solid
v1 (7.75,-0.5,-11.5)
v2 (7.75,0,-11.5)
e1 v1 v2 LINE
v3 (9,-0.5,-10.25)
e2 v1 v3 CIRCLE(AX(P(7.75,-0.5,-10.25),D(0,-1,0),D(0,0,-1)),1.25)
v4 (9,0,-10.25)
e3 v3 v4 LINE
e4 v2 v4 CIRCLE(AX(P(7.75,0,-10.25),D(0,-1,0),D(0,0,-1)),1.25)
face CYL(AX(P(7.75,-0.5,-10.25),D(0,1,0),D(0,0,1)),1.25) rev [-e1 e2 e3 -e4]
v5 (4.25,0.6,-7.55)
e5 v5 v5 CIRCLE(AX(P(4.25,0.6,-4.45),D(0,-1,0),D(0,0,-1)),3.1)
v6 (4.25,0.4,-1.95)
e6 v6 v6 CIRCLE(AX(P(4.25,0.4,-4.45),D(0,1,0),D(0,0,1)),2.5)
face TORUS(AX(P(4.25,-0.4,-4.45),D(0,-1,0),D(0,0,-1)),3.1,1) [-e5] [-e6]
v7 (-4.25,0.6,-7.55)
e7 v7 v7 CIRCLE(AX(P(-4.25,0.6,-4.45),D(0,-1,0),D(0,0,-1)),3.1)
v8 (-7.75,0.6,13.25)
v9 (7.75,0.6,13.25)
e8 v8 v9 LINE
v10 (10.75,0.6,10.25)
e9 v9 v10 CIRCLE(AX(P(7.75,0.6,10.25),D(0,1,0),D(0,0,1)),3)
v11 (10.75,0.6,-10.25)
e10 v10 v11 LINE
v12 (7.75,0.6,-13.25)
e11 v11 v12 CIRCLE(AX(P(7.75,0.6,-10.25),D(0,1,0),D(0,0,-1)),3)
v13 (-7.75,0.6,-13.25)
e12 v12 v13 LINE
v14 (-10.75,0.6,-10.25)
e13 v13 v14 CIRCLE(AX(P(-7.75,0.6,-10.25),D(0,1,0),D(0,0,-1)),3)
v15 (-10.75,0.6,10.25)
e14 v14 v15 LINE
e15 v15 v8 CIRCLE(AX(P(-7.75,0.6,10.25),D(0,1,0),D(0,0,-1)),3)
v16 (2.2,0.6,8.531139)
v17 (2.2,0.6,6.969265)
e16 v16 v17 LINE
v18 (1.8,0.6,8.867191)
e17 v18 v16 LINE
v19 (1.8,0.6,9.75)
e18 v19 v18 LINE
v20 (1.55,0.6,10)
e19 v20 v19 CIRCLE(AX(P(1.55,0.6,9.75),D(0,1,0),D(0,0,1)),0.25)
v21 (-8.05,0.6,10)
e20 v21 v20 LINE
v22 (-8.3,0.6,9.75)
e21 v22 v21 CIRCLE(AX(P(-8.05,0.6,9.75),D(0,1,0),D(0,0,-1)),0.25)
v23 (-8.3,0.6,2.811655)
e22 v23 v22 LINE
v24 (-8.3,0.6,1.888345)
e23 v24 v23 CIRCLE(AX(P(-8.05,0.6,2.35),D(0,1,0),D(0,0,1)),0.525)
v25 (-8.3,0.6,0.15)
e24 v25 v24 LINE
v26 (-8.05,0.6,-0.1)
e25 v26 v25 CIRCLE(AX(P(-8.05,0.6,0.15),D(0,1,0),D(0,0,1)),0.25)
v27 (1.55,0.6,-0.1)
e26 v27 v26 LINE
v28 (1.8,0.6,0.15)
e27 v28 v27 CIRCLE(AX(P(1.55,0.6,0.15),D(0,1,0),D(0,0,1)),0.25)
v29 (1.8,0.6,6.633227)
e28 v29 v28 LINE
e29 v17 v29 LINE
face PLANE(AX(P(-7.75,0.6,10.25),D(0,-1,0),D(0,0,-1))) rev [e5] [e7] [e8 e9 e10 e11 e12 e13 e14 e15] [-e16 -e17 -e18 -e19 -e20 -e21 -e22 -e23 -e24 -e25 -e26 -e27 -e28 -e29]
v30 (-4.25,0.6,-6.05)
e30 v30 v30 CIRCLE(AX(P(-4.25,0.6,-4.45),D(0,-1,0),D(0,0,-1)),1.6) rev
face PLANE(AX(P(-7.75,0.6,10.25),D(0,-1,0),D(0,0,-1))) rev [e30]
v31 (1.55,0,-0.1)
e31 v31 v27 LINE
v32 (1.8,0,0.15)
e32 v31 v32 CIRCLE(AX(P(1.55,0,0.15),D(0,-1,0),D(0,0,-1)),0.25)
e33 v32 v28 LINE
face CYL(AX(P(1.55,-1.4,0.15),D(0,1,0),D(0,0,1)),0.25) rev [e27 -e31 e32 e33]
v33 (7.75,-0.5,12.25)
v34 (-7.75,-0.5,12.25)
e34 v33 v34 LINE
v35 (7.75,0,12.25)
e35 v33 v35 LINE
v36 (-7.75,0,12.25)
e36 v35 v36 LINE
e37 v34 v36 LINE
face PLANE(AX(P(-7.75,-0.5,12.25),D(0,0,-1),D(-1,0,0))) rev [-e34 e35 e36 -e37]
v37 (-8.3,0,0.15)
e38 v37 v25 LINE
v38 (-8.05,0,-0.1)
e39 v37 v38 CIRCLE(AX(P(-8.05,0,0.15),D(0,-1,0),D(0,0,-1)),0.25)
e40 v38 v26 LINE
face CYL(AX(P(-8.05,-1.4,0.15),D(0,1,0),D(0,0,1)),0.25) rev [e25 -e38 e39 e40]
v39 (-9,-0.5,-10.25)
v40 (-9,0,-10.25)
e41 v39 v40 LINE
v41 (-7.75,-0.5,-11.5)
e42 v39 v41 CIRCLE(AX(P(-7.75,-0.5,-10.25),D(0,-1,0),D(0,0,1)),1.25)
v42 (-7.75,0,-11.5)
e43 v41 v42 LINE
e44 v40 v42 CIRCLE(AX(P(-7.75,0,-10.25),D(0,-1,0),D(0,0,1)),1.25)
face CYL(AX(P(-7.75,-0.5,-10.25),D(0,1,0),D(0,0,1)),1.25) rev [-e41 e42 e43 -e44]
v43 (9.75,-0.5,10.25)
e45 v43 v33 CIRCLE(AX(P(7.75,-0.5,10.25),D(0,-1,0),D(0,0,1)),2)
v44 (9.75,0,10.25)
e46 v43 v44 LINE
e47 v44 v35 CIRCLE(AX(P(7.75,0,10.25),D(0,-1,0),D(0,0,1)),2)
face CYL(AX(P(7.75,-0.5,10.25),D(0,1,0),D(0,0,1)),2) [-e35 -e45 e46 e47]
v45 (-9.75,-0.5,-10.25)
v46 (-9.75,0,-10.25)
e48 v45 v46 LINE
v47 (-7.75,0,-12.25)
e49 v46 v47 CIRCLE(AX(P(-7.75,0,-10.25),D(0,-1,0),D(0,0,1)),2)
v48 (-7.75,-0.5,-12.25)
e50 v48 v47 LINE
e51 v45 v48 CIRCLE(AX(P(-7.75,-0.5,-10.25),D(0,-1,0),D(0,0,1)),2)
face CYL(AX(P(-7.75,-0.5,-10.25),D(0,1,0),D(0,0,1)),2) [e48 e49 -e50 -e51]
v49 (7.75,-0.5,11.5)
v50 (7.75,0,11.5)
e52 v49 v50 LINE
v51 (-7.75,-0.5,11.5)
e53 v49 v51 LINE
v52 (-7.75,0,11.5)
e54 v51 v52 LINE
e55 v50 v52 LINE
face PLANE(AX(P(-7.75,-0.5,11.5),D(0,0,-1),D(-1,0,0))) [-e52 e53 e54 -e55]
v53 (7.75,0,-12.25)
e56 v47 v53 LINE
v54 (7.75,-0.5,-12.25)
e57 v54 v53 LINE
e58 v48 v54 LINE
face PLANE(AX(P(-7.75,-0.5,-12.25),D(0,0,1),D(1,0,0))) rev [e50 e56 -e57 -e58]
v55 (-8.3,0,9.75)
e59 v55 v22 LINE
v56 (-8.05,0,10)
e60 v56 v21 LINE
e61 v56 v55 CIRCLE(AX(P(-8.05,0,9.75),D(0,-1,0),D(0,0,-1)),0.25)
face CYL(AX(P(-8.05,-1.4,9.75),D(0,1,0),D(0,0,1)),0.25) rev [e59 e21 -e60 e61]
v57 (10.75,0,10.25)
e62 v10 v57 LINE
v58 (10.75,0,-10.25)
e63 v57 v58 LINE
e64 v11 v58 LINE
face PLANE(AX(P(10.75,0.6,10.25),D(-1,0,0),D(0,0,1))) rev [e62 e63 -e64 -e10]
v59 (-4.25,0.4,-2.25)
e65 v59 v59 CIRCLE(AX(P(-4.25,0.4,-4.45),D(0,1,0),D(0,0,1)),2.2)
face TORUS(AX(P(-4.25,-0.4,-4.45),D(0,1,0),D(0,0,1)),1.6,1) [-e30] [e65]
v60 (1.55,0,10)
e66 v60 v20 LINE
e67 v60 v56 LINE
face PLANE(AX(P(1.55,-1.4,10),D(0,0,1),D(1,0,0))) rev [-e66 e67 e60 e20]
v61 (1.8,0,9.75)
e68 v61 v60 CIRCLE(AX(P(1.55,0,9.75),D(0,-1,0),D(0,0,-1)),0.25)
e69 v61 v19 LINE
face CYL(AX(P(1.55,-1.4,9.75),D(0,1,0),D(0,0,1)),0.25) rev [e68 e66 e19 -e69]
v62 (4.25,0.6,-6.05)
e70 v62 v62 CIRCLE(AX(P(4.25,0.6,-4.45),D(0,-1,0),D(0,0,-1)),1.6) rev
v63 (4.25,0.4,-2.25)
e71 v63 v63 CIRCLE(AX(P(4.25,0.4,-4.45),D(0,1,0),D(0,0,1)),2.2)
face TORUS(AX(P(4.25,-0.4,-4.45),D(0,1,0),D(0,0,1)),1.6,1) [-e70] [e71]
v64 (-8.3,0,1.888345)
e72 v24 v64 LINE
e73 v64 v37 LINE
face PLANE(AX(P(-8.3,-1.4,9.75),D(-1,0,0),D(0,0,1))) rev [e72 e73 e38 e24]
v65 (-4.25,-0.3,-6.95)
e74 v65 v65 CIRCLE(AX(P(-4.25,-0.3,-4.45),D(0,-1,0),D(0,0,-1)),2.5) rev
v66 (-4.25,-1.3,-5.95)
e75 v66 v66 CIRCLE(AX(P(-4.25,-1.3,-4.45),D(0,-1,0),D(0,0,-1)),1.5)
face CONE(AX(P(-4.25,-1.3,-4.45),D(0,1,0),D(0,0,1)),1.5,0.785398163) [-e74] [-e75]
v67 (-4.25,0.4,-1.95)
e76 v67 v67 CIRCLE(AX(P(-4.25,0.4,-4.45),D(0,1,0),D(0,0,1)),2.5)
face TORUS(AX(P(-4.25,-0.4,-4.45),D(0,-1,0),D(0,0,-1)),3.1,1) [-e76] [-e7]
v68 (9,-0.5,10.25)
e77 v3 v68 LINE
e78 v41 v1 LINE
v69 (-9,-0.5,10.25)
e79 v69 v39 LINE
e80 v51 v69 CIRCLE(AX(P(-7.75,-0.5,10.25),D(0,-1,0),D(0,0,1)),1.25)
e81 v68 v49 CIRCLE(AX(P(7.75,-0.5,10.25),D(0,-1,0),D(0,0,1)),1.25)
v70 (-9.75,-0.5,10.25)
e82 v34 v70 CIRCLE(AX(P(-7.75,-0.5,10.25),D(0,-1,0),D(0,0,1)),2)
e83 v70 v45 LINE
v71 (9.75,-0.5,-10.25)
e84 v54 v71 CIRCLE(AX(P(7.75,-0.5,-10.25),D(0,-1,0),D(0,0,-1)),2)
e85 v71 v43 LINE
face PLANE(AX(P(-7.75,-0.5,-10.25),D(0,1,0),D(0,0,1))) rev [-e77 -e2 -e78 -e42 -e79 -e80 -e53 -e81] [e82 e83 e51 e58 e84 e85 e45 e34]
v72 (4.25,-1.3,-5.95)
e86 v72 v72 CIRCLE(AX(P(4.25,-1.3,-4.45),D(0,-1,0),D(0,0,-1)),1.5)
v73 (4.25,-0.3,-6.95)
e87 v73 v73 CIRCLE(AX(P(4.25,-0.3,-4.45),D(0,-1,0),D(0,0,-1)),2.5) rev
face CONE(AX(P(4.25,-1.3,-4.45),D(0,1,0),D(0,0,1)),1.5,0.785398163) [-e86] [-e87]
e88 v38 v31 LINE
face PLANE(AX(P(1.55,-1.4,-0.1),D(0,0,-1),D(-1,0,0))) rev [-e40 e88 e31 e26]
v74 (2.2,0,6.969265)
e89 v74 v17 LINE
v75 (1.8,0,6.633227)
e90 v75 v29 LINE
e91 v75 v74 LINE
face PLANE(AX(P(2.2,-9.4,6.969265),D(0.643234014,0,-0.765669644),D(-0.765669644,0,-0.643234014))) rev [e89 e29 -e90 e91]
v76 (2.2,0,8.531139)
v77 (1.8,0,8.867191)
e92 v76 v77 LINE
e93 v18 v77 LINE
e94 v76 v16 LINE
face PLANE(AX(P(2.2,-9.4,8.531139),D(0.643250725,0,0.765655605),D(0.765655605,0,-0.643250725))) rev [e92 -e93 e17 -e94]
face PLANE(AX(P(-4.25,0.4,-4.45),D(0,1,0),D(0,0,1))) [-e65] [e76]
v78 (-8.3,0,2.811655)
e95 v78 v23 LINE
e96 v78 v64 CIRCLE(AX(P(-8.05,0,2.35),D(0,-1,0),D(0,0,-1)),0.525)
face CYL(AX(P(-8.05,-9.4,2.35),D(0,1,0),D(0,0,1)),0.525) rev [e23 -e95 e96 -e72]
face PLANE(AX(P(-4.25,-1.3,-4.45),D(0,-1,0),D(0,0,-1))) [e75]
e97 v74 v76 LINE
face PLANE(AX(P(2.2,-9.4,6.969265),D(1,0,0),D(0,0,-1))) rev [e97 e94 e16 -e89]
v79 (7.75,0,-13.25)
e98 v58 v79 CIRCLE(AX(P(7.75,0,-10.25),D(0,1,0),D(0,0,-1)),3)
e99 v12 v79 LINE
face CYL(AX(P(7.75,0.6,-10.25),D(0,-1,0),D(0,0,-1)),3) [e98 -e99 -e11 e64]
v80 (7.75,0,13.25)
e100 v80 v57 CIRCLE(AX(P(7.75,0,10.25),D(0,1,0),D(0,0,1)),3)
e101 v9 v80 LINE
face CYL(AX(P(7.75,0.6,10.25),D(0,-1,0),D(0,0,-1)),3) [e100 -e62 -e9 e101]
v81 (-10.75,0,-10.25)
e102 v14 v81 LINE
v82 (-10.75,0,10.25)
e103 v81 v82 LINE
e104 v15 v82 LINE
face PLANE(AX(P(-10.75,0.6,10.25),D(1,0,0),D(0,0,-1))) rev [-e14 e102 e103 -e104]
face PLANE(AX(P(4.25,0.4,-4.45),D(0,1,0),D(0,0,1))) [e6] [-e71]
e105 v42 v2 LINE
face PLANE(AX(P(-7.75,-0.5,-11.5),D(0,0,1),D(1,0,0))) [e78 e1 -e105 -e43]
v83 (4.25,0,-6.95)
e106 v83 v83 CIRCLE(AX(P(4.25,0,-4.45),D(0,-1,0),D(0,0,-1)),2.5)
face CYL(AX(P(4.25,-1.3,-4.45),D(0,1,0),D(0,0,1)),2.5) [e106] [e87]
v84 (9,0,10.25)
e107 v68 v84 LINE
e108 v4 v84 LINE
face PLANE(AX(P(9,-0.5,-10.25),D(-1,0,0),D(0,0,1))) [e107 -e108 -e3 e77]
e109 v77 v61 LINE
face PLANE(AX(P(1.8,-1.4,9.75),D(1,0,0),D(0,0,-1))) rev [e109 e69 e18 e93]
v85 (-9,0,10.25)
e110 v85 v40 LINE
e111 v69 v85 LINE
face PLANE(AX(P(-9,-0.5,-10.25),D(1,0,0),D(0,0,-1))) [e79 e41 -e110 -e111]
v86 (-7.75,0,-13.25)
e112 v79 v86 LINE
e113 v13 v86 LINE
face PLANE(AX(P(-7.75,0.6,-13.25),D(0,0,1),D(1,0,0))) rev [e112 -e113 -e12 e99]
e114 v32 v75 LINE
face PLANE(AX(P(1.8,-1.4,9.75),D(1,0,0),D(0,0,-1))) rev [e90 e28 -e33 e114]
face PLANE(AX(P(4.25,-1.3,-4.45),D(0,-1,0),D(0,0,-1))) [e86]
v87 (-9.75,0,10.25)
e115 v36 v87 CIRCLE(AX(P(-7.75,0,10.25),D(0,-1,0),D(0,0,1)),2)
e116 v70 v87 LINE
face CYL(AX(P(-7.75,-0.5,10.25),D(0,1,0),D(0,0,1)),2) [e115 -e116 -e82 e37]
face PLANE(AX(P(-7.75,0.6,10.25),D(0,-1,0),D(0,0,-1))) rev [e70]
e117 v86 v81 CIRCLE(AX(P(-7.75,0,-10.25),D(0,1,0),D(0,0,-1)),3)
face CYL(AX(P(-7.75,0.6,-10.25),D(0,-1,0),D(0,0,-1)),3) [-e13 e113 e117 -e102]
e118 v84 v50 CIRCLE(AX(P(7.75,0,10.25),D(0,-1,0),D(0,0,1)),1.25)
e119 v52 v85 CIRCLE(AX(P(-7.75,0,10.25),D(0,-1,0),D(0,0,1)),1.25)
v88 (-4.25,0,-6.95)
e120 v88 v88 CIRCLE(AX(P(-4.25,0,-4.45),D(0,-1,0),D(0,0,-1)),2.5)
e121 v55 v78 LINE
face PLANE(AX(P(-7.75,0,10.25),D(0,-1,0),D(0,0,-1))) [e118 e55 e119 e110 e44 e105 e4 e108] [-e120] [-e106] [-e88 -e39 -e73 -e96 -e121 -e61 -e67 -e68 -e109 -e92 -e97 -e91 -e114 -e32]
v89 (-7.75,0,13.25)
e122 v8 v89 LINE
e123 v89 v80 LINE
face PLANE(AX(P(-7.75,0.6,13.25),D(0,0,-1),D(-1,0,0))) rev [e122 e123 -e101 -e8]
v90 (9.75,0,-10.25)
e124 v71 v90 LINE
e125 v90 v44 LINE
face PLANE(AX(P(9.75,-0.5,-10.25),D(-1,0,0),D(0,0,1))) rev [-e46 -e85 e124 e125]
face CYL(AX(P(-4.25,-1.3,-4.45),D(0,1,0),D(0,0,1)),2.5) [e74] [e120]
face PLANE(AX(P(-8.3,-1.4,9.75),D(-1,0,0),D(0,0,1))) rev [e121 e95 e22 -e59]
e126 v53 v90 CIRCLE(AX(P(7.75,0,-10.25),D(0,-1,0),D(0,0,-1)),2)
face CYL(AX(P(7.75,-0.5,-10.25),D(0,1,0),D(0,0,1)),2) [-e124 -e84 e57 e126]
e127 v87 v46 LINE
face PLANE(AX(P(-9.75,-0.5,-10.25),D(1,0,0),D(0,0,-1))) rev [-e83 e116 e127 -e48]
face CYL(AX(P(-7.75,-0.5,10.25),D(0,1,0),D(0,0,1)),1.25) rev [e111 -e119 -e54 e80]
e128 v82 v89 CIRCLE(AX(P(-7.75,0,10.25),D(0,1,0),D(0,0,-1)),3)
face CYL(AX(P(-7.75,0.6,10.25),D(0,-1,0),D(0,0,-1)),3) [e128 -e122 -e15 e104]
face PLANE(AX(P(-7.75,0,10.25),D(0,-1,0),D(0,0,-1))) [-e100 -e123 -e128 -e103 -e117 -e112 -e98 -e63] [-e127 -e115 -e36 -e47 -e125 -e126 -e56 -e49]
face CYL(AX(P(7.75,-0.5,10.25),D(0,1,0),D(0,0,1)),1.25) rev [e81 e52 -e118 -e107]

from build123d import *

# Parameters (mm, degrees)
BOSS_EXTRUDE1_DEPTH = 0.6
CUT_EXTRUDE1_DEPTH  = 2
SKETCH3_R           = 0.525
CUT_EXTRUDE2_DEPTH  = 10
BOSS_EXTRUDE2_DEPTH = 0.5
SKETCH5_R           = 2.5
BOSS_EXTRUDE3_DEPTH = 1.3
SKETCH6_R           = 2.5
SKETCH6_R_2         = 2.2
CUT_EXTRUDE3_DEPTH  = 0.2
FILLET1_R           = 1
CHAMFER1_SIZE       = 1


with BuildPart() as part:
    # Sketch1 → Boss-Extrude1 (new body)
    with BuildSketch(Plane(origin=(0, 0, 0), x_dir=(1, 0, 0), z_dir=(0, 1, 0))):
        with BuildLine():
            Line((-7.75, -13.25), (7.75, -13.25))
            ThreePointArc((7.75, -13.25), (9.871320344, -12.371320344), (10.75, -10.25))
            Line((10.75, -10.25), (10.75, 10.25))
            ThreePointArc((10.75, 10.25), (9.871320344, 12.371320344), (7.75, 13.25))
            Line((7.75, 13.25), (-7.75, 13.25))
            ThreePointArc((-7.75, 13.25), (-9.871320344, 12.371320344), (-10.75, 10.25))
            Line((-10.75, 10.25), (-10.75, -10.25))
            ThreePointArc((-10.75, -10.25), (-9.871320344, -12.371320344), (-7.75, -13.25))
        make_face()
    extrude(amount=BOSS_EXTRUDE1_DEPTH)

    # Sketch2 → Cut-Extrude1 (cut)
    with BuildSketch(Plane(origin=(0, 0.6, 0), x_dir=(1, 0, 0), z_dir=(0, 1, 0))):
        with BuildLine():
            Line((1.55, -10), (-8.05, -10))
            ThreePointArc((-8.05, -10), (-8.226776695, -9.926776695), (-8.3, -9.75))
            Line((-8.3, -9.75), (-8.3, -0.15))
            ThreePointArc((-8.3, -0.15), (-8.226776695, 0.026776695), (-8.05, 0.1))
            Line((-8.05, 0.1), (1.55, 0.1))
            ThreePointArc((1.55, 0.1), (1.726776695, 0.026776695), (1.8, -0.15))
            Line((1.8, -0.15), (1.8, -9.75))
            ThreePointArc((1.8, -9.75), (1.726776695, -9.926776695), (1.55, -10))
        make_face()
    extrude(amount=-CUT_EXTRUDE1_DEPTH, mode=Mode.SUBTRACT)

    # Sketch3 → Cut-Extrude2 (cut)
    with BuildSketch(Plane(origin=(0, 0.6, 0), x_dir=(1, 0, 0), z_dir=(0, 1, 0))):
        with Locations((-8.05, -2.35)):
            Circle(SKETCH3_R)
        Polygon((2.2, -6.969264593), (2.2, -8.531138717), (1.8, -8.867190969), (1.8, -6.633227233), align=None)
    extrude(amount=-CUT_EXTRUDE2_DEPTH, mode=Mode.SUBTRACT)

    # Sketch4 → Boss-Extrude2 (add)
    with BuildSketch(Plane(origin=(0, 0, 0), x_dir=(-1, 0, 0), z_dir=(0, -1, 0))):
        with BuildLine():
            Line((7.75, 12.25), (-7.75, 12.25))
            ThreePointArc((-7.75, 12.25), (-9.164213562, 11.664213562), (-9.75, 10.25))
            Line((-9.75, 10.25), (-9.75, -10.25))
            ThreePointArc((-9.75, -10.25), (-9.164213562, -11.664213562), (-7.75, -12.25))
            Line((-7.75, -12.25), (7.75, -12.25))
            ThreePointArc((7.75, -12.25), (9.164213562, -11.664213562), (9.75, -10.25))
            Line((9.75, -10.25), (9.75, 10.25))
            ThreePointArc((9.75, 10.25), (9.164213562, 11.664213562), (7.75, 12.25))
        make_face()
        with BuildLine():
            Line((7.75, 11.5), (-7.75, 11.5))
            ThreePointArc((-7.75, 11.5), (-8.633883476, 11.133883476), (-9, 10.25))
            Line((-9, 10.25), (-9, -10.25))
            ThreePointArc((-9, -10.25), (-8.633883476, -11.133883476), (-7.75, -11.5))
            Line((-7.75, -11.5), (7.75, -11.5))
            ThreePointArc((7.75, -11.5), (8.633883476, -11.133883476), (9, -10.25))
            Line((9, -10.25), (9, 10.25))
            ThreePointArc((9, 10.25), (8.633883476, 11.133883476), (7.75, 11.5))
        make_face(mode=Mode.SUBTRACT)
    extrude(amount=BOSS_EXTRUDE2_DEPTH)

    # Sketch5 → Boss-Extrude3 (add)
    with BuildSketch(Plane(origin=(0, 0, 0), x_dir=(-1, 0, 0), z_dir=(0, -1, 0))):
        with Locations(Location((-4.25, 4.45, 0), (0, 0, 90))):
            Circle(SKETCH5_R)
        with Locations(Location((4.25, 4.45, 0), (0, 0, 90))):
            Circle(SKETCH5_R)
    extrude(amount=BOSS_EXTRUDE3_DEPTH)

    # Sketch6 → Cut-Extrude3 (cut)
    # profile 1 of 2: a face of its own
    with BuildSketch(Plane(origin=(0, 0.6, 0), x_dir=(1, 0, 0), z_dir=(0, 1, 0))):
        with Locations(Location((4.25, 4.45, 0), (0, 0, 90))):
            Circle(SKETCH6_R)
        with Locations(Location((4.25, 4.45, 0), (0, 0, 270))):
            Circle(SKETCH6_R_2, mode=Mode.SUBTRACT)
    # profile 2 of 2: a face of its own
    with BuildSketch(Plane(origin=(0, 0.6, 0), x_dir=(1, 0, 0), z_dir=(0, 1, 0))):
        with Locations(Location((-4.25, 4.45, 0), (0, 0, 90))):
            Circle(SKETCH6_R)
        with Locations(Location((-4.25, 4.45, 0), (0, 0, 270))):
            Circle(SKETCH6_R_2, mode=Mode.SUBTRACT)
    extrude(amount=-CUT_EXTRUDE3_DEPTH, mode=Mode.SUBTRACT)

    # Fillet1
    # the kernel refuses this fillet: 1 mm, written as the material it takes off along each edge
    with BuildSketch(Plane(origin=(4.25, 0.6, -4.45), x_dir=(0, 0, -1), z_dir=(1, 0, 0))) as fillet1_piece_1:
        with BuildLine():
            CenterArc((3.1, -1), FILLET1_R, 90, 36.869897646)
            Line((2.5, -0.2), (2.488, -0.184))
            ThreePointArc((2.488, -0.184), (2.48, -0.1), (2.48, 0))
            Line((2.48, 0), (2.5, 0.02))
            Line((2.5, 0.02), (3.1, 0.02))
            Line((3.1, 0.02), (3.1, 0))
        make_face()
    revolve(axis=Axis((4.25, 0.6, -4.45), (0, 1, 0)), mode=Mode.SUBTRACT)
    with BuildSketch(Plane(origin=(4.25, 0.6, -4.45), x_dir=(0, 0, 1), z_dir=(-1, 0, 0))) as fillet1_piece_2:
        with BuildLine():
            CenterArc((1.6, -1), FILLET1_R, 53.130102354, 36.869897646)
            Line((1.6, 0), (1.6, 0.02))
            Line((1.6, 0.02), (2.2, 0.02))
            Line((2.2, 0.02), (2.22, 0))
            ThreePointArc((2.22, 0), (2.22, -0.1), (2.212, -0.184))
            Line((2.212, -0.184), (2.2, -0.2))
        make_face()
    revolve(axis=Axis((4.25, 0.6, -4.45), (0, 1, 0)), mode=Mode.SUBTRACT)
    with BuildSketch(Plane(origin=(-4.25, 0.6, -4.45), x_dir=(0, 0, -1), z_dir=(1, 0, 0))) as fillet1_piece_3:
        with BuildLine():
            CenterArc((3.1, -1), FILLET1_R, 90, 36.869897646)
            Line((2.5, -0.2), (2.488, -0.184))
            ThreePointArc((2.488, -0.184), (2.48, -0.1), (2.48, 0))
            Line((2.48, 0), (2.5, 0.02))
            Line((2.5, 0.02), (3.1, 0.02))
            Line((3.1, 0.02), (3.1, 0))
        make_face()
    revolve(axis=Axis((-4.25, 0.6, -4.45), (0, 1, 0)), mode=Mode.SUBTRACT)
    with BuildSketch(Plane(origin=(-4.25, 0.6, -4.45), x_dir=(0, 0, 1), z_dir=(-1, 0, 0))) as fillet1_piece_4:
        with BuildLine():
            CenterArc((1.6, -1), FILLET1_R, 53.130102354, 36.869897646)
            Line((1.6, 0), (1.6, 0.02))
            Line((1.6, 0.02), (2.2, 0.02))
            Line((2.2, 0.02), (2.22, 0))
            ThreePointArc((2.22, 0), (2.22, -0.1), (2.212, -0.184))
            Line((2.212, -0.184), (2.2, -0.2))
        make_face()
    revolve(axis=Axis((-4.25, 0.6, -4.45), (0, 1, 0)), mode=Mode.SUBTRACT)

    # Chamfer1
    chamfer1_edges = [part.edges().sort_by_distance(p)[0] for p in [
        (4.25, -1.3, -1.95),
        (-4.25, -1.3, -1.95),
    ]]
    chamfer(chamfer1_edges, length=CHAMFER1_SIZE)


solid = part.part
